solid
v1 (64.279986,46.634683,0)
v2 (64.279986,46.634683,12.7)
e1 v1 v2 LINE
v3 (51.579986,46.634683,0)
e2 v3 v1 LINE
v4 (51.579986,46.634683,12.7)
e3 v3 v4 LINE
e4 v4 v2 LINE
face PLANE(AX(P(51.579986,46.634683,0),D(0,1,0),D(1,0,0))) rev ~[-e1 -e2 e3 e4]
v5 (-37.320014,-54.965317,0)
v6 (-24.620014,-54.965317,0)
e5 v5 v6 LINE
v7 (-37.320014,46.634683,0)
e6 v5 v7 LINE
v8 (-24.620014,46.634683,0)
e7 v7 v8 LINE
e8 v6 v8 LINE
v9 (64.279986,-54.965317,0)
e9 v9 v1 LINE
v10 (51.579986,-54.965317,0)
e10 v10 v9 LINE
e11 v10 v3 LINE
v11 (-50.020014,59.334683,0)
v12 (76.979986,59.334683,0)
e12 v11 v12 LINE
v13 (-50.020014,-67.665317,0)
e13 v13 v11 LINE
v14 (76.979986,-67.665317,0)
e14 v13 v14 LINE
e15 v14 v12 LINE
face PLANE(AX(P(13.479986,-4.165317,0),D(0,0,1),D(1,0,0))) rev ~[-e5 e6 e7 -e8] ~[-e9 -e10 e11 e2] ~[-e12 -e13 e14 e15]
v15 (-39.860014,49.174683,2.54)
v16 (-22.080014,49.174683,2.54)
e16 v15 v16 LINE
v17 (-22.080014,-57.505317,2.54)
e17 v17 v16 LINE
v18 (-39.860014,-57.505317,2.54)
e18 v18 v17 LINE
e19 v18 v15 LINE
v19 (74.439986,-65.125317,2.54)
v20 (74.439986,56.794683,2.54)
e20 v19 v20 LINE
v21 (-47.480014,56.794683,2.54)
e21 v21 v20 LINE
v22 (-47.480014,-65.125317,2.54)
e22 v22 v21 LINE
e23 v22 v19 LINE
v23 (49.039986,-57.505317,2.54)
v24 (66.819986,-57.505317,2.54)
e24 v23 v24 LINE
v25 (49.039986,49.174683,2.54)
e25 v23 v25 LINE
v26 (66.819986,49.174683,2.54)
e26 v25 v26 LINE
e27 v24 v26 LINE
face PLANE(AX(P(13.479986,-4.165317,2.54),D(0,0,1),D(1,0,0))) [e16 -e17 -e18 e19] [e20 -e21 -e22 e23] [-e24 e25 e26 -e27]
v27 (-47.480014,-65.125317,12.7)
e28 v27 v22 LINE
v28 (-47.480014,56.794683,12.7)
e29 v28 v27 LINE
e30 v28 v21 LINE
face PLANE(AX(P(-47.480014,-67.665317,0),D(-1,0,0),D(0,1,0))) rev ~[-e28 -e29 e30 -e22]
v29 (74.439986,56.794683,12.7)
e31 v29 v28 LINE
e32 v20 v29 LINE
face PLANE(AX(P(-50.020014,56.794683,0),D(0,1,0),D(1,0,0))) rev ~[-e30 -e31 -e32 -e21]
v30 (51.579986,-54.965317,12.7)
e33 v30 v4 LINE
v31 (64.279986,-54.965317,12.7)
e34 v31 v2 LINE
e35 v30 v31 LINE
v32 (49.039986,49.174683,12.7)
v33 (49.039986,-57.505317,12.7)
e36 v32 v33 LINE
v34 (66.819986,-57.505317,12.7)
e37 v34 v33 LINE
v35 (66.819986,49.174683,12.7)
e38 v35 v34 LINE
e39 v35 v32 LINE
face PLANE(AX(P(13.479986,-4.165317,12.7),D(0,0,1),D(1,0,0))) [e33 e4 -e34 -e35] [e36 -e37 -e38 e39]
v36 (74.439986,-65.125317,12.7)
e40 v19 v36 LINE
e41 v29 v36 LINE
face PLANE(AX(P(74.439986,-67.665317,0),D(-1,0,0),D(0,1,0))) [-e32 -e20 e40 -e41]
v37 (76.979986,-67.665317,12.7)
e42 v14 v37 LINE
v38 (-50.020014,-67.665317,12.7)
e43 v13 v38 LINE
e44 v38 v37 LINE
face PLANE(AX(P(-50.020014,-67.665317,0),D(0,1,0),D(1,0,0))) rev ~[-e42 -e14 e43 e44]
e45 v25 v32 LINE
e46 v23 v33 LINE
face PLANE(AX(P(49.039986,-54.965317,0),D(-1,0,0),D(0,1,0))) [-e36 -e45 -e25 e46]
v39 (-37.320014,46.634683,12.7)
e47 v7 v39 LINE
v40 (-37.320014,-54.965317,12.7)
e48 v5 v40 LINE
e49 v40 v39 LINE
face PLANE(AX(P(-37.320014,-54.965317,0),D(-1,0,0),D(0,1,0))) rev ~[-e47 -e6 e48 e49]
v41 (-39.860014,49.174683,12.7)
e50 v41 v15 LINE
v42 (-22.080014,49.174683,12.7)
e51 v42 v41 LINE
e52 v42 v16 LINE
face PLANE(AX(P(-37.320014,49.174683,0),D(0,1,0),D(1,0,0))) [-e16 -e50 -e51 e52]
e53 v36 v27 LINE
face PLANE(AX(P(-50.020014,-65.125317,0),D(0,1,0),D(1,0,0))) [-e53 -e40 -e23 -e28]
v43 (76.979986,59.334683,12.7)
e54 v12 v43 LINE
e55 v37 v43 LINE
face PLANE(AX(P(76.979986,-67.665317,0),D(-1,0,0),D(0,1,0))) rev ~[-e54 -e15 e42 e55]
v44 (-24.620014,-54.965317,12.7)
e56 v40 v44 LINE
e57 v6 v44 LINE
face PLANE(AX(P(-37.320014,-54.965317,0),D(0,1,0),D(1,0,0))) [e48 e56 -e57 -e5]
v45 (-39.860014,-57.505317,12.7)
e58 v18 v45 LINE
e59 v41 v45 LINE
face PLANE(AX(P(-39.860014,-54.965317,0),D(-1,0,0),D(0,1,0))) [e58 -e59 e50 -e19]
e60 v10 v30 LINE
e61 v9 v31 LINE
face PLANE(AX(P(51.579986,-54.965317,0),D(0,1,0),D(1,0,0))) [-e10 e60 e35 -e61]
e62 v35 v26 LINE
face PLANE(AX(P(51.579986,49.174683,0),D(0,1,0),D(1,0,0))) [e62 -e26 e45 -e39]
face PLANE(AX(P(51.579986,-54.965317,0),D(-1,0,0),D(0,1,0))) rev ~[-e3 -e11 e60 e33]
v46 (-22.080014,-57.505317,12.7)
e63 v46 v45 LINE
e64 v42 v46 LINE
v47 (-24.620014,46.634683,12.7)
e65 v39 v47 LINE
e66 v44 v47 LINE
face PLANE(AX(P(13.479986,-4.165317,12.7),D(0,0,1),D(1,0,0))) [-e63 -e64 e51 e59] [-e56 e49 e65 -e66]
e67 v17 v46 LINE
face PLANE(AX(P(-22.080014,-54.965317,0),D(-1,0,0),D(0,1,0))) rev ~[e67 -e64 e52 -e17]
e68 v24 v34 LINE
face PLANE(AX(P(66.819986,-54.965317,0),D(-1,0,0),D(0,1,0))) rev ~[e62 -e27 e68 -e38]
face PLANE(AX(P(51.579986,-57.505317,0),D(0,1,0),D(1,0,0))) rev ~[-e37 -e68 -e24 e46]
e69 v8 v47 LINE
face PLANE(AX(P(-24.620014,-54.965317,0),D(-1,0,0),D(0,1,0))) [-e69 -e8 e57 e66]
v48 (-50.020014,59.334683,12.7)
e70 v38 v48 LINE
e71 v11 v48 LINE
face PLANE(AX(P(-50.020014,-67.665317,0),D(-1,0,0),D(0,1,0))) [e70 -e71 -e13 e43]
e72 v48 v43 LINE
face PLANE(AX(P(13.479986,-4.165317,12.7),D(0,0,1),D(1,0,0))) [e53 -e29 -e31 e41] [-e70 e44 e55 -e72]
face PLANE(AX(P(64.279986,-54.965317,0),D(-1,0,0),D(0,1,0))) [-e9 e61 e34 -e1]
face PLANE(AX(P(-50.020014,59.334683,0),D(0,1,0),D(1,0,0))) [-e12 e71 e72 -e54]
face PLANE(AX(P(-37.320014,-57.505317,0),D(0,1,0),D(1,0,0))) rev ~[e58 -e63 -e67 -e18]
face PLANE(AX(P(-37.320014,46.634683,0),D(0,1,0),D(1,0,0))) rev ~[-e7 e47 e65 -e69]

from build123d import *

# Parameters (mm, degrees)
F0_W     = 127
F0_H     = 127
F0_W_2   = 12.7
F0_H_2   = 101.6
F1_DEPTH = 12.7
F2_T     = -2.54


with BuildPart() as f1:
    # F0 (on Top) → F1 (new body)
    with BuildSketch(Plane.XY):
        with Locations((13.4799859107, -4.1653172493)):
            Rectangle(F0_W, F0_H)
        with Locations((-30.9700140893, -4.1653172493)):
            Rectangle(F0_W_2, F0_H_2, mode=Mode.SUBTRACT)
        with Locations((57.9299859107, -4.1653172493)):
            Rectangle(F0_W_2, F0_H_2, mode=Mode.SUBTRACT)
    extrude(amount=F1_DEPTH)

    # F2
    f2_openings = [f1.faces().sort_by_distance(p)[0] for p in [
        (13.479986, -4.165317, 12.7),
    ]]
    offset(amount=F2_T, openings=f2_openings, kind=Kind.INTERSECTION)


solid = f1.part
